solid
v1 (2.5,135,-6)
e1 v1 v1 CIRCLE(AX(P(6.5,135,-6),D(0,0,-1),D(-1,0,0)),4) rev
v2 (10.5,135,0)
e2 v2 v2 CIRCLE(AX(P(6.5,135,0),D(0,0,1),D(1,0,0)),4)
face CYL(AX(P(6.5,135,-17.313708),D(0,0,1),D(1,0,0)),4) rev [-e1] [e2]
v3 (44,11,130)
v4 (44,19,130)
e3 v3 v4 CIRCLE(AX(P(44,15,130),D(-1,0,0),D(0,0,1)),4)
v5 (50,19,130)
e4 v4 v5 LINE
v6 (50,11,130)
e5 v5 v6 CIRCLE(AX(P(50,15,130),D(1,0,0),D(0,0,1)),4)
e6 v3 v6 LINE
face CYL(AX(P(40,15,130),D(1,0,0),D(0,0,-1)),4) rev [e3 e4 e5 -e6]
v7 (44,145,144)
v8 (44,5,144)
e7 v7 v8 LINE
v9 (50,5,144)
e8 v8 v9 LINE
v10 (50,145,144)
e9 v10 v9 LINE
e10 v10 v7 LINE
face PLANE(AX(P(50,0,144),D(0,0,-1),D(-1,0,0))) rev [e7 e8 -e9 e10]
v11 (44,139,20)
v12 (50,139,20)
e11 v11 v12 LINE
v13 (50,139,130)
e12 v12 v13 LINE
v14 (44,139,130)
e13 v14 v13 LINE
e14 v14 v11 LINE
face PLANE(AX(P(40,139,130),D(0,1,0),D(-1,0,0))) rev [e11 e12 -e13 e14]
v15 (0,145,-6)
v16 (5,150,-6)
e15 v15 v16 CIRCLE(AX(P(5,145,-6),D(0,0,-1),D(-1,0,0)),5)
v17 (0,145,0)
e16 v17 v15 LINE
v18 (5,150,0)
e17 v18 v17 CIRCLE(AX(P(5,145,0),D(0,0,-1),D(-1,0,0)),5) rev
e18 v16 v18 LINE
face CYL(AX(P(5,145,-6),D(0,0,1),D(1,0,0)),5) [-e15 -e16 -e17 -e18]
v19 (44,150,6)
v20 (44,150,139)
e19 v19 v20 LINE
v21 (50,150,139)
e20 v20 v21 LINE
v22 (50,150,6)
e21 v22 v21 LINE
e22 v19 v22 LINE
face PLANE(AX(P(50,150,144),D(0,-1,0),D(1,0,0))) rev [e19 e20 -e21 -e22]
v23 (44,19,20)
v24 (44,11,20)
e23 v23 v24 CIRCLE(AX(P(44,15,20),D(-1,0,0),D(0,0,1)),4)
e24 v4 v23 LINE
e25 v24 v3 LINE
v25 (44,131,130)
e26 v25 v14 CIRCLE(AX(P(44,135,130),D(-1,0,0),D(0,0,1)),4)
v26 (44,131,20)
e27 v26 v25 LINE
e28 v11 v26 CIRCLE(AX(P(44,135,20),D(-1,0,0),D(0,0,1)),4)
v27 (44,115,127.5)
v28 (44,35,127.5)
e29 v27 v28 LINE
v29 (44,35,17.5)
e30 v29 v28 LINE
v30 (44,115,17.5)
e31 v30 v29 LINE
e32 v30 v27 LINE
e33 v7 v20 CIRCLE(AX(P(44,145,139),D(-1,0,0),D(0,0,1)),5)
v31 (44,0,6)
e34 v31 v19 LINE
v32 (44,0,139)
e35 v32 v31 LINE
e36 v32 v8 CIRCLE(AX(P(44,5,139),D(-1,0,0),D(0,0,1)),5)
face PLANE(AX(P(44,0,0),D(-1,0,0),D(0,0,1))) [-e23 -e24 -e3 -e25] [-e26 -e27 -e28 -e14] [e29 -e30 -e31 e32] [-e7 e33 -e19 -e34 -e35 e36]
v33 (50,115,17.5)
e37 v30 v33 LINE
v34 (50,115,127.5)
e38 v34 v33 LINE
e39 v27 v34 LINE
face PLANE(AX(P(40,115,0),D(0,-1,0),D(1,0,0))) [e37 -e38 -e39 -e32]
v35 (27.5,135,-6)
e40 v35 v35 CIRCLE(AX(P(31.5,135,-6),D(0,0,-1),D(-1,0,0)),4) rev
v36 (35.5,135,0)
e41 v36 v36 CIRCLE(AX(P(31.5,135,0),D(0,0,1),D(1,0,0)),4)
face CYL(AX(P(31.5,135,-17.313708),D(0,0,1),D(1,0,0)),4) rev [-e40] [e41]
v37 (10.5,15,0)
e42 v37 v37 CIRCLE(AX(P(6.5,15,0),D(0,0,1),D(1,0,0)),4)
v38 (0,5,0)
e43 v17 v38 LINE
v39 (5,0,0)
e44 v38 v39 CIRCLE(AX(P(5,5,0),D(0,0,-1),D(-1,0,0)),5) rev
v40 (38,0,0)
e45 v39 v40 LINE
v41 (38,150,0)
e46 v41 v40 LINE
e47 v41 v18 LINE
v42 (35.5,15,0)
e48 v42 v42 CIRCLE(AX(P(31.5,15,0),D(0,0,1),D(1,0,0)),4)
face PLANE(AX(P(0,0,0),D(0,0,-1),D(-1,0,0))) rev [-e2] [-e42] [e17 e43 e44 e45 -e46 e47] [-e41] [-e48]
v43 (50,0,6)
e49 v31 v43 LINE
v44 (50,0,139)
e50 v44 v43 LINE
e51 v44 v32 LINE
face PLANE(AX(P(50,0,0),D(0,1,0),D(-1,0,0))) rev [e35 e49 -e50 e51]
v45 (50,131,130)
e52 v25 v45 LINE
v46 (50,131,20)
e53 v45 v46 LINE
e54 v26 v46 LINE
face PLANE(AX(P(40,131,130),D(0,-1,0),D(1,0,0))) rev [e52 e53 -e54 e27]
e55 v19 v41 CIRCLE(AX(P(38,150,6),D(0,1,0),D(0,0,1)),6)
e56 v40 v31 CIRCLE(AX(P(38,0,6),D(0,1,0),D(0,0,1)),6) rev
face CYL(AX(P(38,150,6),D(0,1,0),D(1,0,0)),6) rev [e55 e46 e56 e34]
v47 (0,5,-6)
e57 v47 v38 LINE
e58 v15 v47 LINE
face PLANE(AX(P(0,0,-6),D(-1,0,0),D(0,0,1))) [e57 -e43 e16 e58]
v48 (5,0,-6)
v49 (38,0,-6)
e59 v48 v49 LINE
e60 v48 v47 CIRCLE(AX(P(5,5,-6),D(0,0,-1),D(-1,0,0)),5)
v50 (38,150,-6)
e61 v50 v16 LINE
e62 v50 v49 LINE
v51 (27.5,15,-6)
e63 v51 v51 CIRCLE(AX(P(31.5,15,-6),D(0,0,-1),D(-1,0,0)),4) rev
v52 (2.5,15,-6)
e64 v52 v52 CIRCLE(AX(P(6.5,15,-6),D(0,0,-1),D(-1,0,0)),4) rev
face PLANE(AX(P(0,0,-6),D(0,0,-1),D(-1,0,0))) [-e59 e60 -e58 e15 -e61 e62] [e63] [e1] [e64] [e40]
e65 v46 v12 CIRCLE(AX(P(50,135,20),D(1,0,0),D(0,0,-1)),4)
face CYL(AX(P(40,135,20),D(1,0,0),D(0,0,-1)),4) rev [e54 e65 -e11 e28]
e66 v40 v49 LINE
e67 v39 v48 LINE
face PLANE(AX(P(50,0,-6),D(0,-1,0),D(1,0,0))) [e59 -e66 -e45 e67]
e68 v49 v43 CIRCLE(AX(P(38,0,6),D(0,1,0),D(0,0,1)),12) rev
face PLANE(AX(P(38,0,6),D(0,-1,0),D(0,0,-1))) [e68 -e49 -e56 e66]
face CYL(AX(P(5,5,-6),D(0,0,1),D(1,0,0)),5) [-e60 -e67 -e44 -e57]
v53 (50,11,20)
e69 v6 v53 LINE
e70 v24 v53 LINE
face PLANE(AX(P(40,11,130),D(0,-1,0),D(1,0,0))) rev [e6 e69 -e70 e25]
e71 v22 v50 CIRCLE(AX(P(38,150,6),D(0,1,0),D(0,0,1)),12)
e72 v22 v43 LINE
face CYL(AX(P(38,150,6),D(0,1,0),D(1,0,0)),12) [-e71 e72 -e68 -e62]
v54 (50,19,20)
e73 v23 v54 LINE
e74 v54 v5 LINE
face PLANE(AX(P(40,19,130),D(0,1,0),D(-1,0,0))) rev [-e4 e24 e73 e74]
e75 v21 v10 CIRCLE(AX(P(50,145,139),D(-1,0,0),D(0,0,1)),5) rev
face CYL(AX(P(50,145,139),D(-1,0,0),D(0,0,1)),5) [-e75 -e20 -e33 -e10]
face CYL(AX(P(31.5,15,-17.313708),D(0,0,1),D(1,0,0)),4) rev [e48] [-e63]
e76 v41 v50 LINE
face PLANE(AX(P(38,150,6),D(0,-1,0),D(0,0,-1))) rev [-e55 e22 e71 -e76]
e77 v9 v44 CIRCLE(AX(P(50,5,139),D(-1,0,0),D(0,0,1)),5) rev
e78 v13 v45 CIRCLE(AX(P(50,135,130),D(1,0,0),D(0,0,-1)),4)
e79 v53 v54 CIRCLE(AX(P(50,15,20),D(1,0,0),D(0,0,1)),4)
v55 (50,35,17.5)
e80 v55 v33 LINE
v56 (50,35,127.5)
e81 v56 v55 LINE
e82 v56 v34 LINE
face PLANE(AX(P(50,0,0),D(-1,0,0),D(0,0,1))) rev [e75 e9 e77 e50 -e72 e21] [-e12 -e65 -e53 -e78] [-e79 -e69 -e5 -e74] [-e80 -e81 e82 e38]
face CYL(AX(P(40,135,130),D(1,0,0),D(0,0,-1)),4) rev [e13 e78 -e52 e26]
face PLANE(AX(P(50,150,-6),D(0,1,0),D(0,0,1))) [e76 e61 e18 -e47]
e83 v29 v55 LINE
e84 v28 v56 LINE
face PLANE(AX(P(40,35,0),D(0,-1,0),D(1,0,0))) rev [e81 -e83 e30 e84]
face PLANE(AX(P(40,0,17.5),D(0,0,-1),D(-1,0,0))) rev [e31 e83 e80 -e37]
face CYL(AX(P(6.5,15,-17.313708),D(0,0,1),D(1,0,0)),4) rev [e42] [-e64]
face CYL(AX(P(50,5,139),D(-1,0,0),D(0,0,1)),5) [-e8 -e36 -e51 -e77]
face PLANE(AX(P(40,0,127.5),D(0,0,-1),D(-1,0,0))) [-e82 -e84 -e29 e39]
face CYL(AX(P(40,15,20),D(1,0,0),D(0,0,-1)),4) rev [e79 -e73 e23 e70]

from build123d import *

# Parameters (mm, degrees)
SKETCH1_W                    = 50
SKETCH1_H                    = 150
BASE_FLANGE1_DEPTH           = 6
EDGE_FLANGE1_STRIP_W         = 36
EDGE_FLANGE1_STRIP_H         = 6
EDGE_FLANGE1_STRIP_CUT_DEPTH = 150
EDGE_FLANGE1_DEPTH           = 150
SKETCH9_R                    = 4
CUT_EXTRUDE1_DEPTH           = 6
CUT_EXTRUDE2_DEPTH           = 10
FILLET1_R                    = 5
SKETCH11_W                   = 20
SKETCH11_H                   = 80
SKETCH11_W_2                 = 70
SKETCH11_R                   = 4
SKETCH11_R_2                 = 20
CUT_EXTRUDE5_DEPTH           = 10


# Sheet-metal steps are written as plain solids
with BuildPart() as part:
    # Sketch1 → Base-Flange1 (new body)
    with BuildSketch(Plane.XY):
        with Locations((25, 75)):
            Rectangle(SKETCH1_W, SKETCH1_H)
    extrude(amount=-BASE_FLANGE1_DEPTH)

    # Edge-Flange1 strip (across the edge) → Edge-Flange1 strip cut (cut)
    with BuildSketch(Plane(origin=(50, 0, 0), x_dir=(-1, 0, 0), z_dir=(0, 1, 0))):
        with Locations((-6, -3)):
            Rectangle(EDGE_FLANGE1_STRIP_W, EDGE_FLANGE1_STRIP_H)
    extrude(amount=EDGE_FLANGE1_STRIP_CUT_DEPTH, mode=Mode.SUBTRACT)

    # Edge-Flange1 section (across the edge) → Edge-Flange1 (add)
    with BuildSketch(Plane(origin=(50, 0, 0), x_dir=(-1, 0, 0), z_dir=(0, 1, 0))):
        with BuildLine():
            Line((0, 6), (0, 144))
            Line((0, 144), (6, 144))
            Line((6, 144), (6, 6))
            ThreePointArc((6, 6), (7.757359313, 1.757359313), (12, 0))
            Line((12, 0), (12, -6))
            ThreePointArc((12, -6), (3.514718626, -2.485281374), (0, 6))
        make_face()
    extrude(amount=EDGE_FLANGE1_DEPTH)

    # Sketch9 → Cut-Extrude1 (cut)
    with BuildSketch(Plane.XY):
        with Locations((6.5, 135)):
            Circle(SKETCH9_R)
        with Locations((31.5, 135)):
            Circle(SKETCH9_R)
        with Locations((6.5, 15)):
            Circle(SKETCH9_R)
        with Locations((31.5, 15)):
            Circle(SKETCH9_R)
    extrude(amount=-CUT_EXTRUDE1_DEPTH, mode=Mode.SUBTRACT)

    # Sketch10 → Cut-Extrude2 (cut)
    with BuildSketch(Plane(origin=(50, 0, 0), x_dir=(0, 0, -1), z_dir=(1, 0, 0))):
        with BuildLine():
            Line((-130, 139), (-20, 139))
            ThreePointArc((-20, 139), (-16, 135), (-20, 131))
            Line((-20, 131), (-130, 131))
            ThreePointArc((-130, 131), (-134, 135), (-130, 139))
        make_face()
        with BuildLine():
            Line((-130, 11), (-20, 11))
            ThreePointArc((-20, 11), (-16, 15), (-20, 19))
            Line((-20, 19), (-130, 19))
            ThreePointArc((-130, 19), (-134, 15), (-130, 11))
        make_face()
    extrude(amount=-CUT_EXTRUDE2_DEPTH, mode=Mode.SUBTRACT)

    # Fillet1
    fillet1_edges = [part.edges().sort_by_distance(p)[0] for p in [
        (47, 0, 144),
        (47, 150, 144),
        (0, 0, -3),
        (0, 150, -3),
    ]]
    fillet(fillet1_edges, radius=FILLET1_R)

    # Sketch11 → Cut-Extrude5 (cut)
    # profile 1 of 6: a face of its own
    with BuildSketch(Plane(origin=(50, 0, 0), x_dir=(0, 0, -1), z_dir=(1, 0, 0))):
        with Locations((-117.5, 75)):
            Rectangle(SKETCH11_W, SKETCH11_H)
    # profile 2 of 6: a face of its own
    with BuildSketch(Plane(origin=(50, 0, 0), x_dir=(0, 0, -1), z_dir=(1, 0, 0))):
        with Locations((-27.5, 75)):
            Rectangle(SKETCH11_W, SKETCH11_H)
    # profile 3 of 6: a face of its own
    with BuildSketch(Plane(origin=(50, 0, 0), x_dir=(0, 0, -1), z_dir=(1, 0, 0))):
        with Locations((-72.5, 75)):
            Rectangle(SKETCH11_W_2, SKETCH11_H)
        with Locations((-97.5, 50)):
            Circle(SKETCH11_R, mode=Mode.SUBTRACT)
        with Locations((-47.5, 50)):
            Circle(SKETCH11_R, mode=Mode.SUBTRACT)
        with Locations((-72.5, 75)):
            Circle(SKETCH11_R_2, mode=Mode.SUBTRACT)
        with Locations((-97.5, 100)):
            Circle(SKETCH11_R, mode=Mode.SUBTRACT)
        with Locations((-47.5, 100)):
            Circle(SKETCH11_R, mode=Mode.SUBTRACT)
    # profile 4 of 6: a face of its own
    with BuildSketch(Plane(origin=(50, 0, 0), x_dir=(0, 0, -1), z_dir=(1, 0, 0))):
        with Locations((-72.5, 75)):
            Circle(SKETCH11_R_2)
    # profile 5 of 6: a face of its own
    with BuildSketch(Plane(origin=(50, 0, 0), x_dir=(0, 0, -1), z_dir=(1, 0, 0))):
        with Locations((-47.5, 50)):
            Circle(SKETCH11_R)
    # profile 6 of 6: a face of its own
    with BuildSketch(Plane(origin=(50, 0, 0), x_dir=(0, 0, -1), z_dir=(1, 0, 0))):
        with Locations((-47.5, 100)):
            Circle(SKETCH11_R)
    extrude(amount=-CUT_EXTRUDE5_DEPTH, mode=Mode.SUBTRACT)


with BuildPart() as cut_extrude5_kept_piece:
    # of the separate pieces the step leaves, the one the design keeps (cut_extrude5_pieces_kept)
    add(part.part.solids().sort_by_distance((0, 5, 0))[0])


solid = cut_extrude5_kept_piece.part
